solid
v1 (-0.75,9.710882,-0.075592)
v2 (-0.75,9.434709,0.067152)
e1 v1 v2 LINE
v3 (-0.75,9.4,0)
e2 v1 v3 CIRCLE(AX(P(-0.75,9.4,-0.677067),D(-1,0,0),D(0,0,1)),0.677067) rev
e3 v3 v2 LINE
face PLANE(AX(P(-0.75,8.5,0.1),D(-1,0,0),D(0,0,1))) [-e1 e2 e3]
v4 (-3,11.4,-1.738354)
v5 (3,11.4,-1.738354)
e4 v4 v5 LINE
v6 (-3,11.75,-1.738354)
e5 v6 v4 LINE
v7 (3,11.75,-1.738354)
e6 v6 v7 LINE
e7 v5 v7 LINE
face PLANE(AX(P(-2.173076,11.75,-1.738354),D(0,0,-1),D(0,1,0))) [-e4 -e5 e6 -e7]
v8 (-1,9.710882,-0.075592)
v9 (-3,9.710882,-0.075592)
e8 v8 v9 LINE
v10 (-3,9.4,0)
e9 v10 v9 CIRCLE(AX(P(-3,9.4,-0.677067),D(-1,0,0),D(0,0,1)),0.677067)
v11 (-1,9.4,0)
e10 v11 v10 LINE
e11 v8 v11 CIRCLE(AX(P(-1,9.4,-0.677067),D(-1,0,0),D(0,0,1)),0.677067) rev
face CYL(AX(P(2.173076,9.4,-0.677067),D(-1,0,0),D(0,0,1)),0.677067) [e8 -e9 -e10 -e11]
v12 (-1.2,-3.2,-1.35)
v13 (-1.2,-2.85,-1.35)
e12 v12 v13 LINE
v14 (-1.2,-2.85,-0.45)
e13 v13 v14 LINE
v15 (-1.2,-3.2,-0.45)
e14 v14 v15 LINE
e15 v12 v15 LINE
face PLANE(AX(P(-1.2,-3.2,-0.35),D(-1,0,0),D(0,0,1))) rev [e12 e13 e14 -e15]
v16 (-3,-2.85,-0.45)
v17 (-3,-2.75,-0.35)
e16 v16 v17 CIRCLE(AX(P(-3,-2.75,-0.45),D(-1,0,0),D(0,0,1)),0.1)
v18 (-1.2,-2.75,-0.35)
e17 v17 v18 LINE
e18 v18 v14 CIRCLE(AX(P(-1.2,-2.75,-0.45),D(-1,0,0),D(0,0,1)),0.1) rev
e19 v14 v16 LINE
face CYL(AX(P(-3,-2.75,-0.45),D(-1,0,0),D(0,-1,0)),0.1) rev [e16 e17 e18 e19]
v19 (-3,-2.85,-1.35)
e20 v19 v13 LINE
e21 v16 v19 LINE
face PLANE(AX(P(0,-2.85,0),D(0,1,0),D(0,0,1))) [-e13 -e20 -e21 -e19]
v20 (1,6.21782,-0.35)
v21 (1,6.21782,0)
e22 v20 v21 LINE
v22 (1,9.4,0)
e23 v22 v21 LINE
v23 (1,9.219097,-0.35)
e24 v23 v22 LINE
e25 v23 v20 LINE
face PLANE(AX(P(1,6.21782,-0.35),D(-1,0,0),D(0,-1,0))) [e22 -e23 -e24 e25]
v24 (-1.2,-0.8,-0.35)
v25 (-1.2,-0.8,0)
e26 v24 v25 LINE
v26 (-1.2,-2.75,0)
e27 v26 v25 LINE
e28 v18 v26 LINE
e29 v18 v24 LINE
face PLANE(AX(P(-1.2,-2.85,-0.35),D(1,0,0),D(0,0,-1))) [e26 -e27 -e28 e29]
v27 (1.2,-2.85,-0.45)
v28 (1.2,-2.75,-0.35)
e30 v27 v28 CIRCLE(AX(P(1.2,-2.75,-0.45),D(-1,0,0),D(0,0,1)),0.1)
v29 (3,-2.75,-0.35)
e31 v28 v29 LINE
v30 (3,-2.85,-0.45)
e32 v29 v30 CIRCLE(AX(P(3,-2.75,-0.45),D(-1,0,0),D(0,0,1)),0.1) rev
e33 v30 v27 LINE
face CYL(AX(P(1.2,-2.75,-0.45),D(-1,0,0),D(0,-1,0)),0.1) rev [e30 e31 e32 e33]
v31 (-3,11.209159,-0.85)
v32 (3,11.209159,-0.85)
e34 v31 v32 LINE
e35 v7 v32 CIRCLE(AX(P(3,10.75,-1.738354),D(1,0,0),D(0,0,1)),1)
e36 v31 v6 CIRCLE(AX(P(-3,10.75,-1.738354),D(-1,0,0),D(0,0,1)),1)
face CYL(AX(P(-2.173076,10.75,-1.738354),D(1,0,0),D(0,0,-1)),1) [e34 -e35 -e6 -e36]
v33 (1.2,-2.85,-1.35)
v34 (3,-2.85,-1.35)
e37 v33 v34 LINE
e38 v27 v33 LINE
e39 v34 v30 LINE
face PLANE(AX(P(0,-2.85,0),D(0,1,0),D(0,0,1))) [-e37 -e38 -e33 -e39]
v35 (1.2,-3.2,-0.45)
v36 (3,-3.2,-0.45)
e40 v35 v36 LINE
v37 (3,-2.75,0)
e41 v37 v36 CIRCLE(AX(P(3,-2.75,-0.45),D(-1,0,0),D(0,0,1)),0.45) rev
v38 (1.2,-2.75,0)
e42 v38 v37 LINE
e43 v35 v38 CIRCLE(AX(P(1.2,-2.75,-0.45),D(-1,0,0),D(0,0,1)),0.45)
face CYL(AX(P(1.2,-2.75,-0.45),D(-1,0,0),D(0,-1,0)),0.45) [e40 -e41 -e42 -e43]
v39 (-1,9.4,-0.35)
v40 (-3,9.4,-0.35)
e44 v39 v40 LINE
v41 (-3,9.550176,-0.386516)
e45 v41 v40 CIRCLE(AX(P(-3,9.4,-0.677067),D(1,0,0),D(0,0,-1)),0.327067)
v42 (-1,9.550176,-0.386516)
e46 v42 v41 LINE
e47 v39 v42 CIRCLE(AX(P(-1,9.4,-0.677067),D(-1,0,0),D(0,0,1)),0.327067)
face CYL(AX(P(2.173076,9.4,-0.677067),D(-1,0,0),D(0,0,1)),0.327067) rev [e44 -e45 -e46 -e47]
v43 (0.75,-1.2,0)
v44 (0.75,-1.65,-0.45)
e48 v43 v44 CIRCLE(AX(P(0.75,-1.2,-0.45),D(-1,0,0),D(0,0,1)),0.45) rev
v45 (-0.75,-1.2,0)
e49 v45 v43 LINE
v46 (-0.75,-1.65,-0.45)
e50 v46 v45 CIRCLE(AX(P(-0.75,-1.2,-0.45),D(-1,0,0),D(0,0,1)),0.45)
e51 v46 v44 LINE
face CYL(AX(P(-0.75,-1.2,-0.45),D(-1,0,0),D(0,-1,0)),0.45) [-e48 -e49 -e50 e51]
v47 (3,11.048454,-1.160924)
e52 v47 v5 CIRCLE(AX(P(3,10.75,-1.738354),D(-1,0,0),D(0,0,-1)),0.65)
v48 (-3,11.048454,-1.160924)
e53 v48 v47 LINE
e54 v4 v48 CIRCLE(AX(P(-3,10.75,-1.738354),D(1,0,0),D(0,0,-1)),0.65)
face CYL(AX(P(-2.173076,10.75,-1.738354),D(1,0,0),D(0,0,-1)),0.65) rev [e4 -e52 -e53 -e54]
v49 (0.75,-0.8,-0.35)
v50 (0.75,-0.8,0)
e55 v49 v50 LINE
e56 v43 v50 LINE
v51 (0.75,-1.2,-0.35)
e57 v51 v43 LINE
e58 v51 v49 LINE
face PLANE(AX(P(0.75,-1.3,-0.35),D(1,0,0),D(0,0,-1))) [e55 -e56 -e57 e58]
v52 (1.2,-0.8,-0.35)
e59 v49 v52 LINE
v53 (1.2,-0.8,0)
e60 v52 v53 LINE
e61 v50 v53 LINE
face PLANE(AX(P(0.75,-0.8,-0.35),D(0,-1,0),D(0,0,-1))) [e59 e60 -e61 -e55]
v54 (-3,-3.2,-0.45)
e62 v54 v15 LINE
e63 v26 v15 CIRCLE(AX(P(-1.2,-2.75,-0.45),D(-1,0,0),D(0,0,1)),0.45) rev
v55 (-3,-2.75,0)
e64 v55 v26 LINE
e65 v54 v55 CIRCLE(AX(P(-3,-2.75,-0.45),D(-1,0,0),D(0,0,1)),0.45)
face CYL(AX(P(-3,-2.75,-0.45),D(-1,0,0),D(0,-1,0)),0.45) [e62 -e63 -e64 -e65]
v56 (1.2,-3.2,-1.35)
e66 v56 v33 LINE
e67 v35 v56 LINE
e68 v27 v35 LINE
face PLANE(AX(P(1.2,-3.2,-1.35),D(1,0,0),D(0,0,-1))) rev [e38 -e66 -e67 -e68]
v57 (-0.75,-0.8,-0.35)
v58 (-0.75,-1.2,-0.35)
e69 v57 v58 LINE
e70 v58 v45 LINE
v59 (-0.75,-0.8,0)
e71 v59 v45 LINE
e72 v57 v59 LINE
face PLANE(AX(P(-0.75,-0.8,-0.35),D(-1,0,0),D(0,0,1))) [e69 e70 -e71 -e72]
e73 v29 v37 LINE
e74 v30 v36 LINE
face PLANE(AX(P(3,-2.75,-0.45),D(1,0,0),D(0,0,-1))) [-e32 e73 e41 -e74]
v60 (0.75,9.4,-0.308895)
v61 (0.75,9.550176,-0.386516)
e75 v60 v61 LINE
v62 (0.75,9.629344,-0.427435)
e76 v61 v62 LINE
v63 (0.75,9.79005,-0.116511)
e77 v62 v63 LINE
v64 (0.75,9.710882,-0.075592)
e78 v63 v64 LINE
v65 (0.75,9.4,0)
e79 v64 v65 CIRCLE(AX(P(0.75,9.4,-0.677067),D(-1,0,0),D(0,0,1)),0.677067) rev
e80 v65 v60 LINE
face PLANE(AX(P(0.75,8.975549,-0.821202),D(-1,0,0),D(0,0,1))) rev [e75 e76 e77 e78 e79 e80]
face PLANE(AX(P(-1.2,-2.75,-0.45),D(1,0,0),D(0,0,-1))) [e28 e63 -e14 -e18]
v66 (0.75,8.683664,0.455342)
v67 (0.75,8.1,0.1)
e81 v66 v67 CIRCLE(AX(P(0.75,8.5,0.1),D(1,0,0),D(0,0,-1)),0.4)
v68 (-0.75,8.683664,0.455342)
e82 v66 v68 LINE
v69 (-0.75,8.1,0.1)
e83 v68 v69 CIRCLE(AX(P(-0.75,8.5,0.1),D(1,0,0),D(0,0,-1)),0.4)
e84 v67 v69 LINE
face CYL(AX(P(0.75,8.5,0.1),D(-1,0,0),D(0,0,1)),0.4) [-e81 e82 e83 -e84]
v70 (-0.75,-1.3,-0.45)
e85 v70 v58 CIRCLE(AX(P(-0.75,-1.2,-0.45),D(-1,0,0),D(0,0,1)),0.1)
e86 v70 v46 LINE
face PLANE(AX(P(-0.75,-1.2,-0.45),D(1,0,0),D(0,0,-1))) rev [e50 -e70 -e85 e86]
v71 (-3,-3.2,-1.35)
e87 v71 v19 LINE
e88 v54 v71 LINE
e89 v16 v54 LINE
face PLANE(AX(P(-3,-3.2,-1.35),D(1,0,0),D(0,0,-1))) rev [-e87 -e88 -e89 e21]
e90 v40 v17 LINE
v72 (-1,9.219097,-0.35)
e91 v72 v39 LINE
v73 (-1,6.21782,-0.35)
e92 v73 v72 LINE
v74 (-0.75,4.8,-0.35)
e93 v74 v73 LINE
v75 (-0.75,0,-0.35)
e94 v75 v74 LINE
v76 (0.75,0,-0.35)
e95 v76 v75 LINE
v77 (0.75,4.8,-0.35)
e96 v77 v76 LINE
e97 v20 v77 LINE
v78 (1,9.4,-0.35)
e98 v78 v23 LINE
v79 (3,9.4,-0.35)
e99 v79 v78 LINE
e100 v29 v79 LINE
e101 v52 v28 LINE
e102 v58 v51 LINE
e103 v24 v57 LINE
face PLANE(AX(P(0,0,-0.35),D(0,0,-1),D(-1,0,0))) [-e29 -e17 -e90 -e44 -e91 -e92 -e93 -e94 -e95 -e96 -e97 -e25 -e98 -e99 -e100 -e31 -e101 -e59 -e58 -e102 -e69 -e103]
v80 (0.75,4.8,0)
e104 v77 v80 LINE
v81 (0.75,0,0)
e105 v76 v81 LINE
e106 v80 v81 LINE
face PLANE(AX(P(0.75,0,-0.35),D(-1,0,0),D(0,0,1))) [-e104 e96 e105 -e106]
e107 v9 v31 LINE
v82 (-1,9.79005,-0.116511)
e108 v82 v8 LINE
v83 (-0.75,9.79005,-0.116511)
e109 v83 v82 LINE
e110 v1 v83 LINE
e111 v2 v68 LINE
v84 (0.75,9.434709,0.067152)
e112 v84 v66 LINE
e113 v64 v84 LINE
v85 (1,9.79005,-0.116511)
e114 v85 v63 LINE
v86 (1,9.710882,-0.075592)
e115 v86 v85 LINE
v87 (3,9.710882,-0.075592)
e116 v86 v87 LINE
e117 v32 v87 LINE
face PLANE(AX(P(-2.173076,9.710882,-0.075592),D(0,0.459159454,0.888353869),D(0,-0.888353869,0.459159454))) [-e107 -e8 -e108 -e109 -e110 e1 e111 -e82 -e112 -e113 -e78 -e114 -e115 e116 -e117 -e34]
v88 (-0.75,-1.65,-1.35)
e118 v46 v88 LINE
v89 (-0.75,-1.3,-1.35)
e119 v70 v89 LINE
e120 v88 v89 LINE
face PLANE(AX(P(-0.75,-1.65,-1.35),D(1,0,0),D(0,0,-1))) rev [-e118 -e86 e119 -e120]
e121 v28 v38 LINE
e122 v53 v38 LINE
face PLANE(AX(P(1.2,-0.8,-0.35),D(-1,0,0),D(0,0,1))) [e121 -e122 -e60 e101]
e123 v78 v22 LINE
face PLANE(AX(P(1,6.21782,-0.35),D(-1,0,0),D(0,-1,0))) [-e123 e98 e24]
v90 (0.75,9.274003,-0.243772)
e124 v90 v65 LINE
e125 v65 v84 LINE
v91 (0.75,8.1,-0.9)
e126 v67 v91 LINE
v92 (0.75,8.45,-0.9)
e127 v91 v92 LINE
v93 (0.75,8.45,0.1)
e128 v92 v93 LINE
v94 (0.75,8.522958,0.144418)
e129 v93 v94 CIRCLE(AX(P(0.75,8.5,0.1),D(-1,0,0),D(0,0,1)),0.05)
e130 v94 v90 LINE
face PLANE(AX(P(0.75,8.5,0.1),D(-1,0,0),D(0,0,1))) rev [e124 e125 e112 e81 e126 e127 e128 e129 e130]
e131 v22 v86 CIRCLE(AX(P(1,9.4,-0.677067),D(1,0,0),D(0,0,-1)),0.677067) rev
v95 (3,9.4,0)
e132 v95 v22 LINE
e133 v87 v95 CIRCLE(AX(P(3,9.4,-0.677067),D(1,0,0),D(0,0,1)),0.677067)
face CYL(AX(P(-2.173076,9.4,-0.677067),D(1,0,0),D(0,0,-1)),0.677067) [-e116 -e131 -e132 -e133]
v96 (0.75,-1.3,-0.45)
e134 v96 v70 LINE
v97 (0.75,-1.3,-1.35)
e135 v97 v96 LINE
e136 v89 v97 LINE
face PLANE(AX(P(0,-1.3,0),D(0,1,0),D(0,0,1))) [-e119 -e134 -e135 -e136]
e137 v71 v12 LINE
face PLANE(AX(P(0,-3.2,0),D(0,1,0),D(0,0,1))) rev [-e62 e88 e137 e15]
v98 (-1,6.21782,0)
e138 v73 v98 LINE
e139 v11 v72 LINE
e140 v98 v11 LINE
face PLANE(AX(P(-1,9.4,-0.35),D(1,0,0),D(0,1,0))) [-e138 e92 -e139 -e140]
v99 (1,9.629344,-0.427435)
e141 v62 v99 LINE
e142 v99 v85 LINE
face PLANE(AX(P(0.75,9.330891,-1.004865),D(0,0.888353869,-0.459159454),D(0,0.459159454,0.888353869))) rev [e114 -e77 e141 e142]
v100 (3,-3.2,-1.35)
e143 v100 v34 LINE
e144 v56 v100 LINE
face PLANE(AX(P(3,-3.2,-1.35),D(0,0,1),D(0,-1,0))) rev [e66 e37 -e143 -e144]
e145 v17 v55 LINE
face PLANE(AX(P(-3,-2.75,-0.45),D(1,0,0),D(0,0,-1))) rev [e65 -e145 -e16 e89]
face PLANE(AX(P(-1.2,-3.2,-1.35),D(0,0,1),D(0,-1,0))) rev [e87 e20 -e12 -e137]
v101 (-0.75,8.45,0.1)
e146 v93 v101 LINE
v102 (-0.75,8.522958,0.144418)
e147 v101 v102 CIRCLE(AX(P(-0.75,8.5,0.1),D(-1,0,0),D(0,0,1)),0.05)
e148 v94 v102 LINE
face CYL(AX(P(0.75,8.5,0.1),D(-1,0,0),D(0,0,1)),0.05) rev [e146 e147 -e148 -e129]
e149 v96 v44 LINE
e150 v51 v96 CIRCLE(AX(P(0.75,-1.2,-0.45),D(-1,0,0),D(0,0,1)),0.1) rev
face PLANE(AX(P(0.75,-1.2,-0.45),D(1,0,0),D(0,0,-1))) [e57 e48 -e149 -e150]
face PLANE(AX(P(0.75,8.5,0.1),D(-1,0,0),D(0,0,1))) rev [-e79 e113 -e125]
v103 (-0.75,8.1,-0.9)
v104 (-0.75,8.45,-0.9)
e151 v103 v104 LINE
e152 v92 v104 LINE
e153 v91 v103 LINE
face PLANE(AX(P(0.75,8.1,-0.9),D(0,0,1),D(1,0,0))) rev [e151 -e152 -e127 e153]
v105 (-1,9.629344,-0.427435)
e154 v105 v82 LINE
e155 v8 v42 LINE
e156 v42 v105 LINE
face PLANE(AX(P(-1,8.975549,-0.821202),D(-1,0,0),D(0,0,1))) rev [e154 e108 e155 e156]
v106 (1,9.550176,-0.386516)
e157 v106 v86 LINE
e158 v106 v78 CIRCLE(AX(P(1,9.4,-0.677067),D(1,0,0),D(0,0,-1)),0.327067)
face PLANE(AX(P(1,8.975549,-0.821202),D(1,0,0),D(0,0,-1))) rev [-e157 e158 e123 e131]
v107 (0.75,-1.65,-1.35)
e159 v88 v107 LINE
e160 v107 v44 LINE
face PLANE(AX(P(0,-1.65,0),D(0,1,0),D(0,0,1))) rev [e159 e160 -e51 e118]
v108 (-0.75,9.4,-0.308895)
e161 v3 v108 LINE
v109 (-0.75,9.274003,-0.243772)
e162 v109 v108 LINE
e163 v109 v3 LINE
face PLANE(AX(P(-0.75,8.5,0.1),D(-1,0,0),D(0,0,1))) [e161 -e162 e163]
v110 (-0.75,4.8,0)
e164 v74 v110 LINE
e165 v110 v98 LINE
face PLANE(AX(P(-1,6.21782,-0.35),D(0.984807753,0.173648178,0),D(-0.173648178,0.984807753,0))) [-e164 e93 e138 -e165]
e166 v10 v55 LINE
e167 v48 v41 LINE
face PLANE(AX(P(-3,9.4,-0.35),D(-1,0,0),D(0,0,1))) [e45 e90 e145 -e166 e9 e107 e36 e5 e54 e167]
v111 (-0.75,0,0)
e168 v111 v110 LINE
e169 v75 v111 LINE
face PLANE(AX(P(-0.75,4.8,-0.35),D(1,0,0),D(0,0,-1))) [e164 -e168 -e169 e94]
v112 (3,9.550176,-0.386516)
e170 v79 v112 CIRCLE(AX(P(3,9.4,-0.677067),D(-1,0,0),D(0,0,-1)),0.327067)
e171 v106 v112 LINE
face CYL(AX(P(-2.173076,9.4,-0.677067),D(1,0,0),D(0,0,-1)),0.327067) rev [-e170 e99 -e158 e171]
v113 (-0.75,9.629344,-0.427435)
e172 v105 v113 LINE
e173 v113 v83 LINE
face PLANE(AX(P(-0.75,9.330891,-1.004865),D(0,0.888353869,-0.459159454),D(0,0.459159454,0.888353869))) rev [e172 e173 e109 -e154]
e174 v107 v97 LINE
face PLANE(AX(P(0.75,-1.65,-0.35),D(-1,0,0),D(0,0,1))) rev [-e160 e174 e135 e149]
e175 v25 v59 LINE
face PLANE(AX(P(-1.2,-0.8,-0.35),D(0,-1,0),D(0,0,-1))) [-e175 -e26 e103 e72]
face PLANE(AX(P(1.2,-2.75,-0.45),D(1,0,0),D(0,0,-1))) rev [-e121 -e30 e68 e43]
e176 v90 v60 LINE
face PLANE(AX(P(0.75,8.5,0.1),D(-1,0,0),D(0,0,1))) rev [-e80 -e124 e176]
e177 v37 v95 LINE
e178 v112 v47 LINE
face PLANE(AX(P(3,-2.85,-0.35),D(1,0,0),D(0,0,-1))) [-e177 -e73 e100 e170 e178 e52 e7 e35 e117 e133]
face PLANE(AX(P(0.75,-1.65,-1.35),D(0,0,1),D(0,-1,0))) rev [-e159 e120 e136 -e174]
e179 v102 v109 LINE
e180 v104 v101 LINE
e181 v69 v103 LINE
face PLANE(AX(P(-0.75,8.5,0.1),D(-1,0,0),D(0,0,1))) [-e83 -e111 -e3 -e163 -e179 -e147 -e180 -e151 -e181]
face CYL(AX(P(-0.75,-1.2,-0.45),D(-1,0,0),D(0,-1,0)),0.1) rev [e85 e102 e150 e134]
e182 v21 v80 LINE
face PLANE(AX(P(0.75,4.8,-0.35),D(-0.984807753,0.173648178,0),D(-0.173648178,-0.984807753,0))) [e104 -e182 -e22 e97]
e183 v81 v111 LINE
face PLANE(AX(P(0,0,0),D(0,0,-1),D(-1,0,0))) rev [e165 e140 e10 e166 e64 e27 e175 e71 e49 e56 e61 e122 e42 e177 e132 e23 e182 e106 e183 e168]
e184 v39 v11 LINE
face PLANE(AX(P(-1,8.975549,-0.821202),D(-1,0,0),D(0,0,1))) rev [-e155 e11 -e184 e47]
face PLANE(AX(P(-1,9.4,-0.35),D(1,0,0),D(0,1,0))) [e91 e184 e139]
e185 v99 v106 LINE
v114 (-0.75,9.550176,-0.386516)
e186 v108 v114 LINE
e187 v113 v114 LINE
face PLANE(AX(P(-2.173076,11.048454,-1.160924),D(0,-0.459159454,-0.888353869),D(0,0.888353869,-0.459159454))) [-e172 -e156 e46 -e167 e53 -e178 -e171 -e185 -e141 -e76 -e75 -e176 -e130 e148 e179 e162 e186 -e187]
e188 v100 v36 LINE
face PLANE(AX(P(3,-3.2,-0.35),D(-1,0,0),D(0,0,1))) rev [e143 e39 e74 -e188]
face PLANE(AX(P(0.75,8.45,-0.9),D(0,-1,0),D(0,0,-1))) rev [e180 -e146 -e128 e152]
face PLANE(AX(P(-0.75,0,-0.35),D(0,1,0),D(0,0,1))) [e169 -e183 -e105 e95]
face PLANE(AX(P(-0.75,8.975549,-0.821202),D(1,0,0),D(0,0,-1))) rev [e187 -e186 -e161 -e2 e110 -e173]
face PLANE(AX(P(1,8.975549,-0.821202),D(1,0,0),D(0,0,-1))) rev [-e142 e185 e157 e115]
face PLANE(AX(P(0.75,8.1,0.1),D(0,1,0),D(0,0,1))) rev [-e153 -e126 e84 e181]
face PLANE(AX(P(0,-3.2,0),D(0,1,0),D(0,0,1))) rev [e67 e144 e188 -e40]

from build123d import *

# Parameters (mm, degrees)
MAIN_PLATE_DEPTH               = 0.35
EDGE_FLANGE1_STRIP_W           = 1.6
EDGE_FLANGE1_STRIP_H           = 0.35
EDGE_FLANGE1_STRIP_CUT_DEPTH   = 1.8
EDGE_FLANGE1_STRIP_2_W         = 1.6
EDGE_FLANGE1_STRIP_2_H         = 0.35
EDGE_FLANGE1_STRIP_CUT_2_DEPTH = 1.8
EDGE_FLANGE1_STRIP_3_W         = 1.6
EDGE_FLANGE1_STRIP_3_H         = 0.35
EDGE_FLANGE1_STRIP_CUT_3_DEPTH = 1.5
EDGE_FLANGE1_DEPTH             = 1.8
EDGE_FLANGE1_BEND_DEPTH        = 1.8
EDGE_FLANGE1_BEND_2_DEPTH      = 1.5
CENTRAL_SECTION_DEPTH          = 0.75
BOSS_EXTRUDE3_DEPTH            = 2.25
BOSS_EXTRUDE4_START            = -2.25
BOSS_EXTRUDE4_DEPTH            = 2.25
SKETCH20_W                     = 0.25
SKETCH20_H                     = 0.4
CUT_EXTRUDE1_DEPTH             = 1


# Sheet-metal steps are written as plain solids
with BuildPart() as part:
    # Sketch1 → Main Plate (new body)
    with BuildSketch(Plane.XY):
        Polygon((-3, 9.4), (-3, -2.85), (-1.2, -2.85), (-1.2, -0.8), (-0.75, -0.8), (-0.75, -1.3), (0.75, -1.3), (0.75, -0.8), (1.2, -0.8), (1.2, -2.85), (3, -2.85), (3, 9.4), (1, 9.4), (1, 6.217820455), (0.75, 4.8), (0.75, 0), (-0.75, 0), (-0.75, 4.8), (-1, 6.217820455), (-1, 9.4), align=None)
    extrude(amount=-MAIN_PLATE_DEPTH)

    # Edge-Flange1 strip (across the edge) → Edge-Flange1 strip cut (cut)
    with BuildSketch(Plane(origin=(3, -2.85, -0.35), x_dir=(0, 1, 0), z_dir=(-1, 0, 0))):
        with Locations((-0.7, -0.175)):
            Rectangle(EDGE_FLANGE1_STRIP_W, EDGE_FLANGE1_STRIP_H)
    extrude(amount=EDGE_FLANGE1_STRIP_CUT_DEPTH, mode=Mode.SUBTRACT)

    # Edge-Flange1 strip 2 (across the edge) → Edge-Flange1 strip cut 2 (cut)
    with BuildSketch(Plane(origin=(-1.2, -2.85, -0.35), x_dir=(0, 1, 0), z_dir=(-1, 0, 0))):
        with Locations((-0.7, -0.175)):
            Rectangle(EDGE_FLANGE1_STRIP_2_W, EDGE_FLANGE1_STRIP_2_H)
    extrude(amount=EDGE_FLANGE1_STRIP_CUT_2_DEPTH, mode=Mode.SUBTRACT)

    # Edge-Flange1 strip 3 (across the edge) → Edge-Flange1 strip cut 3 (cut)
    with BuildSketch(Plane(origin=(0.75, -1.3, -0.35), x_dir=(0, 1, 0), z_dir=(-1, 0, 0))):
        with Locations((-0.7, -0.175)):
            Rectangle(EDGE_FLANGE1_STRIP_3_W, EDGE_FLANGE1_STRIP_3_H)
    extrude(amount=EDGE_FLANGE1_STRIP_CUT_3_DEPTH, mode=Mode.SUBTRACT)

    # Edge-Flange1 section (across the edge) → Edge-Flange1 (add)
    with BuildSketch(Plane(origin=(3, -2.85, -0.35), x_dir=(0, 1, 0), z_dir=(-1, 0, 0))):
        with BuildLine():
            Line((-0.35, 0.1), (-0.35, 1))
            Line((-0.35, 1), (0, 1))
            Line((0, 1), (0, 0.1))
            ThreePointArc((0, 0.1), (0.029289322, 0.029289322), (0.1, 0))
            Line((0.1, 0), (0.1, -0.35))
            ThreePointArc((0.1, -0.35), (-0.218198052, -0.218198052), (-0.35, 0.1))
        make_face()
    extrude(amount=EDGE_FLANGE1_DEPTH)

    # Edge-Flange1 section 2 (across the edge) → Edge-Flange1 bend (add)
    with BuildSketch(Plane(origin=(-1.2, -2.85, -0.35), x_dir=(0, 1, 0), z_dir=(-1, 0, 0))):
        with BuildLine():
            Line((-0.35, 0.1), (-0.35, 1))
            Line((-0.35, 1), (0, 1))
            Line((0, 1), (0, 0.1))
            ThreePointArc((0, 0.1), (0.029289322, 0.029289322), (0.1, 0))
            Line((0.1, 0), (0.1, -0.35))
            ThreePointArc((0.1, -0.35), (-0.218198052, -0.218198052), (-0.35, 0.1))
        make_face()
    extrude(amount=EDGE_FLANGE1_BEND_DEPTH)

    # Edge-Flange1 section 3 (across the edge) → Edge-Flange1 bend 2 (add)
    with BuildSketch(Plane(origin=(0.75, -1.3, -0.35), x_dir=(0, 1, 0), z_dir=(-1, 0, 0))):
        with BuildLine():
            Line((-0.35, 0.1), (-0.35, 1))
            Line((-0.35, 1), (0, 1))
            Line((0, 1), (0, 0.1))
            ThreePointArc((0, 0.1), (0.029289322, 0.029289322), (0.1, 0))
            Line((0.1, 0), (0.1, -0.35))
            ThreePointArc((0.1, -0.35), (-0.218198052, -0.218198052), (-0.35, 0.1))
        make_face()
    extrude(amount=EDGE_FLANGE1_BEND_2_DEPTH)



with BuildPart() as body_2:
    # Sketch15 → Central Section (new, symmetric)
    with BuildSketch(Plane(origin=(0, 0, 0), x_dir=(0, 0, -1), z_dir=(1, 0, 0))):
        with BuildLine():
            Line((0.9, 8.1), (0.9, 8.45))
            Line((0.9, 8.45), (-0.1, 8.45))
            ThreePointArc((-0.1, 8.45), (-0.14270772, 8.473999025), (-0.144417693, 8.522957973))
            Line((-0.144417693, 8.522957973), (1.160923854, 11.048453645))
            ThreePointArc((1.160923854, 11.048453645), (1.400341198, 11.305200355), (1.738353869, 11.4))
            Line((1.738353869, 11.4), (1.738353869, 11.75))
            ThreePointArc((1.738353869, 11.75), (1.218334376, 11.604154393), (0.85, 11.209159454))
            Line((0.85, 11.209159454), (-0.455341547, 8.683663782))
            ThreePointArc((-0.455341547, 8.683663782), (-0.441661757, 8.291992203), (-0.1, 8.1))
            Line((-0.1, 8.1), (0.9, 8.1))
        make_face()
    extrude(amount=CENTRAL_SECTION_DEPTH, both=True)


with BuildPart() as part_1:
    add(part.part)

    add(body_2.part)  # Boss-Extrude3 merges body 2
    # Sketch16 → Boss-Extrude3 (add)
    with BuildSketch(Plane(origin=(3, 0, 0), x_dir=(0, 0, -1), z_dir=(1, 0, 0))):
        with BuildLine():
            Line((0.35, 9.4), (0, 9.4))
            ThreePointArc((0, 9.4), (0.019169334, 9.55996991), (0.075591878, 9.710881579))
            Line((0.075591878, 9.710881579), (0.85, 11.209159454))
            ThreePointArc((0.85, 11.209159454), (1.218334376, 11.604154393), (1.738353869, 11.75))
            Line((1.738353869, 11.75), (1.738353869, 11.4))
            ThreePointArc((1.738353869, 11.4), (1.400341198, 11.305200355), (1.160923854, 11.048453645))
            Line((1.160923854, 11.048453645), (0.386515732, 9.55017577))
            ThreePointArc((0.386515732, 9.55017577), (0.359260019, 9.477275741), (0.35, 9.4))
        make_face()
    extrude(amount=-BOSS_EXTRUDE3_DEPTH)

    # Sketch19 → Boss-Extrude4 (add)
    with BuildSketch(Plane.ZY.offset(3).offset(BOSS_EXTRUDE4_START)):
        with BuildLine():
            Line((-0.35, 9.4), (0, 9.4))
            ThreePointArc((0, 9.4), (-0.019169334, 9.55996991), (-0.075591878, 9.710881579))
            Line((-0.075591878, 9.710881579), (-0.85, 11.209159454))
            ThreePointArc((-0.85, 11.209159454), (-1.218334376, 11.604154393), (-1.738353869, 11.75))
            Line((-1.738353869, 11.75), (-1.738353869, 11.4))
            ThreePointArc((-1.738353869, 11.4), (-1.400341198, 11.305200355), (-1.160923854, 11.048453645))
            Line((-1.160923854, 11.048453645), (-0.386515732, 9.55017577))
            ThreePointArc((-0.386515732, 9.55017577), (-0.359260019, 9.477275741), (-0.35, 9.4))
        make_face()
    extrude(amount=BOSS_EXTRUDE4_DEPTH)

    # Sketch20 → Cut-Extrude1 (cut)
    with BuildSketch(Plane(origin=(0, 2.016486324, 3.901375463), x_dir=(1, 0, 0), z_dir=(0, 0.4591594538479162, 0.8883538686481212))):
        with Locations((0.875, 8.550526365)):
            Rectangle(SKETCH20_W, SKETCH20_H)
        with Locations((-0.875, 8.550526365)):
            Rectangle(SKETCH20_W, SKETCH20_H)
    extrude(amount=-CUT_EXTRUDE1_DEPTH, mode=Mode.SUBTRACT)


solid = part_1.part
